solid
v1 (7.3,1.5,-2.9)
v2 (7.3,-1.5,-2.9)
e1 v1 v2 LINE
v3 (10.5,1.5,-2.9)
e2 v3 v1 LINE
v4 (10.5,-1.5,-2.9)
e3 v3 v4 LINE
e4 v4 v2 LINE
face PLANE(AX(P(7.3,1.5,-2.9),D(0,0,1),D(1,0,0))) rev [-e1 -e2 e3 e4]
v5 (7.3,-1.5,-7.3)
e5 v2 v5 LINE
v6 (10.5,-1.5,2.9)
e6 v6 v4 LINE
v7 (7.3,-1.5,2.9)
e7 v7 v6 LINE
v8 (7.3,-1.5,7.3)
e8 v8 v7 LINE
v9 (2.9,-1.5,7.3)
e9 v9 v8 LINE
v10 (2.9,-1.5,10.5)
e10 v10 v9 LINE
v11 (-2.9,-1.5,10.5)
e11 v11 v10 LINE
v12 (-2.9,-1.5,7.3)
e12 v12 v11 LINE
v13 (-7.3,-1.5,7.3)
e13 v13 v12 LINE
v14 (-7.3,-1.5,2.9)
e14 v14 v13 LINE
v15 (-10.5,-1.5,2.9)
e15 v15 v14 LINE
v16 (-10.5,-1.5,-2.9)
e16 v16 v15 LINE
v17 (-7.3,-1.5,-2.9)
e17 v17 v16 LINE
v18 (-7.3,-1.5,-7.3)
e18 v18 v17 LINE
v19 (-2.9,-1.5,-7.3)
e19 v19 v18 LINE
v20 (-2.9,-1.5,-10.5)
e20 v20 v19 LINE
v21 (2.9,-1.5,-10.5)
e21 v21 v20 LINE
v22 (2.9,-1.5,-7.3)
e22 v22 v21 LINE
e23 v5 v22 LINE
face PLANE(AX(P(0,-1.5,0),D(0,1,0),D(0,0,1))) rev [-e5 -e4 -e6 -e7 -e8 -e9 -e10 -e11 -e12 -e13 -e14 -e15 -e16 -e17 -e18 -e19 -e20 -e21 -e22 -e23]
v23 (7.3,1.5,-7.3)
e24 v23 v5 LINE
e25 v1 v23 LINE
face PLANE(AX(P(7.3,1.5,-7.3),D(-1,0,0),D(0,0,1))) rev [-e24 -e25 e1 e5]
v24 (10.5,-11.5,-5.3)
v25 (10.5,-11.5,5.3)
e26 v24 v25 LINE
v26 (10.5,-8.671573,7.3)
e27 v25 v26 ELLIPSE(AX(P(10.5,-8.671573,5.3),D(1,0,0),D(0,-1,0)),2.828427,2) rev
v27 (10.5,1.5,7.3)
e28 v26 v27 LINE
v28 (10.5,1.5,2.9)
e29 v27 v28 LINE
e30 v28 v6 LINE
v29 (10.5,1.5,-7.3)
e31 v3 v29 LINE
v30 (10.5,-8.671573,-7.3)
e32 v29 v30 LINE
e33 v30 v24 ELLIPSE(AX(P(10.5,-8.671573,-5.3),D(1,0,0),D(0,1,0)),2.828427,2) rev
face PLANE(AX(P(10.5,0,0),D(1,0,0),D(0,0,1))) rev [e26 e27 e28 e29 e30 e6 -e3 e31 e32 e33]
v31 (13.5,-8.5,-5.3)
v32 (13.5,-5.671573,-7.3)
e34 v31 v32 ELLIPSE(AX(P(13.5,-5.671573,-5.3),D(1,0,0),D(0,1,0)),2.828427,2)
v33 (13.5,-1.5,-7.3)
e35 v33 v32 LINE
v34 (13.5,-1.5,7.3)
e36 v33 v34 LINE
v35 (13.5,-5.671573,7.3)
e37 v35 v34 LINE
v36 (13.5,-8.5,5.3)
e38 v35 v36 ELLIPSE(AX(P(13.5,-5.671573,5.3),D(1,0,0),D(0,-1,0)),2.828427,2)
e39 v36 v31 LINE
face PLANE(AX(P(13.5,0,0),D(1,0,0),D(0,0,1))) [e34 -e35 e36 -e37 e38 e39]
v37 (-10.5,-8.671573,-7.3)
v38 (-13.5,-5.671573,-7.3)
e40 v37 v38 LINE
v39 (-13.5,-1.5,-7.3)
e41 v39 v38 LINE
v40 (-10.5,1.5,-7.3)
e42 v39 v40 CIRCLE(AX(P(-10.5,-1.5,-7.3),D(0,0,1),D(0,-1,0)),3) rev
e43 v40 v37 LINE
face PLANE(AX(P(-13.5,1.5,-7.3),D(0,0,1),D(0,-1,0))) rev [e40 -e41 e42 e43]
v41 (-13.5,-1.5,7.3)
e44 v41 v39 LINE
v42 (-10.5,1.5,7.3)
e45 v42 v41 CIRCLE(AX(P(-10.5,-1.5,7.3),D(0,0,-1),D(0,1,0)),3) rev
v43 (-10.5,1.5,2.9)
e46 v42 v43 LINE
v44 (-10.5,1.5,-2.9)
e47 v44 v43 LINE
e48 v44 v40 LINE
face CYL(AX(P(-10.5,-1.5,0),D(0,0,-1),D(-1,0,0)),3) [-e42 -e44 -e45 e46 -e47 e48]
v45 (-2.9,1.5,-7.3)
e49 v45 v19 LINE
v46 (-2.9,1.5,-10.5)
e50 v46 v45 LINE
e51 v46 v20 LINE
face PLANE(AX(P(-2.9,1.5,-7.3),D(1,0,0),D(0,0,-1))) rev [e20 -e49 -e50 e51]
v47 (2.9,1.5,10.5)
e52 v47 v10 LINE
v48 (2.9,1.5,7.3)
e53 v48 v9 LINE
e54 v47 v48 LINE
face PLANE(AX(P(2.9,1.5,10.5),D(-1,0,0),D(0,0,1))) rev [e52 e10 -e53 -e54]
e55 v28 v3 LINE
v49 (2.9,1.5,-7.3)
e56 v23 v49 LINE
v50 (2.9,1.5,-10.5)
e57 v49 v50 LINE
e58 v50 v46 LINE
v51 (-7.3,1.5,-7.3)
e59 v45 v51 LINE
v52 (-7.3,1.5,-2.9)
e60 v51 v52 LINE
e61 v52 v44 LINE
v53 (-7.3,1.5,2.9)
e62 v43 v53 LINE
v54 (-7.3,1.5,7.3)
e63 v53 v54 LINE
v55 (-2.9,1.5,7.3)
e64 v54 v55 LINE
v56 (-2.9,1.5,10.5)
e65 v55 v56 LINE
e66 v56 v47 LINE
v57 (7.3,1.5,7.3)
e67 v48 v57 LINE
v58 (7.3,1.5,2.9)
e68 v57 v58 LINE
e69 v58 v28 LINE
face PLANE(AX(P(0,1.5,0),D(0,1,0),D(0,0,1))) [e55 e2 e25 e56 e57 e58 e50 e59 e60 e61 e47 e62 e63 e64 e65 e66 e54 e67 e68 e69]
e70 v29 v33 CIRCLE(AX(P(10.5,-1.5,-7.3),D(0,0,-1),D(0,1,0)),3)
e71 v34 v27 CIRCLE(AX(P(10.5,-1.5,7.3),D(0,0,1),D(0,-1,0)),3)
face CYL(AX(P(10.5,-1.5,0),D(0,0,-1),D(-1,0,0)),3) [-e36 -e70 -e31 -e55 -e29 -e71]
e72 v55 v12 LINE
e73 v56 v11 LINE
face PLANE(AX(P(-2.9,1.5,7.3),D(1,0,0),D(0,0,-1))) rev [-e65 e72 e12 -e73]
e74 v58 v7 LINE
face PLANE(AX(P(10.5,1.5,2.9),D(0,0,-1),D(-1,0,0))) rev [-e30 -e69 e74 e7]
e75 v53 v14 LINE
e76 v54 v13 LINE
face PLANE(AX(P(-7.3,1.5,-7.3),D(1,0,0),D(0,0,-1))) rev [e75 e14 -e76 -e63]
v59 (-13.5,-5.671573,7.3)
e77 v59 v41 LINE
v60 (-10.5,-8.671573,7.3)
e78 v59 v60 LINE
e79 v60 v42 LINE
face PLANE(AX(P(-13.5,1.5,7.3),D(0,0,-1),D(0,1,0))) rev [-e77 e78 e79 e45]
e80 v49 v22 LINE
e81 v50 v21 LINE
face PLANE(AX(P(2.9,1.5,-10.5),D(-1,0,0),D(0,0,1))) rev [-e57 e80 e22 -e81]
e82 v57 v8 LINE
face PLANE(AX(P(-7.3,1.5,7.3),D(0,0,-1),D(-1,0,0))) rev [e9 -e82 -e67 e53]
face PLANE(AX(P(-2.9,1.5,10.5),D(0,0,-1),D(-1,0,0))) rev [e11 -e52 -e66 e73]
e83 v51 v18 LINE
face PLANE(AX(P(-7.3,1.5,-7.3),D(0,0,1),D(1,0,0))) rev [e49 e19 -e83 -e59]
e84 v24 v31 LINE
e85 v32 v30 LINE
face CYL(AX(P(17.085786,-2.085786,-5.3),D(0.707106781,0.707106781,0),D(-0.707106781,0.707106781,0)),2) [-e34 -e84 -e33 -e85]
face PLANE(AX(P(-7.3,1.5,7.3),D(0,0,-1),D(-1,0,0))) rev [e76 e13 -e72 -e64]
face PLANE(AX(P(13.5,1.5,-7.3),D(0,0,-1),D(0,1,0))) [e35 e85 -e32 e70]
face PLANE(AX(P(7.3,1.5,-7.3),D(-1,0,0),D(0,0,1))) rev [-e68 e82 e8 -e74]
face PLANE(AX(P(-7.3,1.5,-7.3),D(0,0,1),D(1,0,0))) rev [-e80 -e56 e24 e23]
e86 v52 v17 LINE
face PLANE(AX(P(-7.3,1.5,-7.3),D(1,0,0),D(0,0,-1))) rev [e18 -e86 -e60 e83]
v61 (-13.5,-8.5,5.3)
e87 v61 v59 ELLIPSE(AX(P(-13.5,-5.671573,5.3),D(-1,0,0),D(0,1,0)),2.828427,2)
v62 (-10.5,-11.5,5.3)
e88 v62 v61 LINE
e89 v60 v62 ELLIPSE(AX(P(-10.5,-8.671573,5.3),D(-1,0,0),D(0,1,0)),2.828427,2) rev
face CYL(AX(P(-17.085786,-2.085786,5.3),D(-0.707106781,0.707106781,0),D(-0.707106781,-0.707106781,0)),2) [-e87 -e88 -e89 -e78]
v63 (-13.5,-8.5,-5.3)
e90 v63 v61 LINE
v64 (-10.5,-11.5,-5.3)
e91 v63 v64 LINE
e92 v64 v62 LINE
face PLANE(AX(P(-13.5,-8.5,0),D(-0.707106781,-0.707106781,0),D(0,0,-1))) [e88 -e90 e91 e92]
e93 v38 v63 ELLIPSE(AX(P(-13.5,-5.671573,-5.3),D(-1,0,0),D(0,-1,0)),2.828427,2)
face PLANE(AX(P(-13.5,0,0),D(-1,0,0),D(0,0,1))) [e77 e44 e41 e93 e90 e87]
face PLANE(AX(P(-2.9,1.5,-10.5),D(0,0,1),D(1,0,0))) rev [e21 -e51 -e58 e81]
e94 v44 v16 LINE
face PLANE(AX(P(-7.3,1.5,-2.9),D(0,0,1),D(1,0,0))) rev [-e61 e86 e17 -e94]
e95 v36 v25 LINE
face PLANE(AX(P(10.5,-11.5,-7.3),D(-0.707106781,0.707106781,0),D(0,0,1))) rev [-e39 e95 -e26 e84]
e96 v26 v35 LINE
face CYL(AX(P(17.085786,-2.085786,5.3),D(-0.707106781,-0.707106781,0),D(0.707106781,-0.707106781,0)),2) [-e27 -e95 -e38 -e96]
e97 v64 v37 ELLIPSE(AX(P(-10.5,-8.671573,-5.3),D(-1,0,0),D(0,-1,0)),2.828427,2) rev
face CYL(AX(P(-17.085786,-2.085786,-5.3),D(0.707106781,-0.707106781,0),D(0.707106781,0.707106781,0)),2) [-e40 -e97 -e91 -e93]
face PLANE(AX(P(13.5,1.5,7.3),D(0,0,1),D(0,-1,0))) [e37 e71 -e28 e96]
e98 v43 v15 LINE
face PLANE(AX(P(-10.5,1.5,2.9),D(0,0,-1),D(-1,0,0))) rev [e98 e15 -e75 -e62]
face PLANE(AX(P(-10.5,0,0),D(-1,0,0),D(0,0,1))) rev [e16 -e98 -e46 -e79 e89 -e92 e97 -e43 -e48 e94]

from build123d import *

# Parameters (mm, degrees)
SKETCH1_W           = 14.6
SKETCH1_H           = 14.6
BOSS_EXTRUDE1_DEPTH = 1.5
SKETCH2_W           = 5.8
SKETCH2_H           = 3.2
SKETCH2_W_2         = 3.2
SKETCH2_H_2         = 5.8
BOSS_EXTRUDE2_DEPTH = 1.5
SKETCH4_W           = 14.6
SKETCH4_H           = 13
BOSS_EXTRUDE3_DEPTH = 3
FILLET5_R           = 3
CHAMFER1_SIZE       = 3
FILLET4_R           = 2


with BuildPart() as part:
    # Sketch1 → Boss-Extrude1 (new, symmetric)
    with BuildSketch(Plane(origin=(0, 0, 0), x_dir=(1, 0, 0), z_dir=(0, 1, 0))):
        Rectangle(SKETCH1_W, SKETCH1_H)
    extrude(amount=BOSS_EXTRUDE1_DEPTH, both=True)

    # Sketch2 → Boss-Extrude2 (add, symmetric)
    with BuildSketch(Plane(origin=(0, 0, 0), x_dir=(1, 0, 0), z_dir=(0, 1, 0))):
        with Locations((0, 8.9)):
            Rectangle(SKETCH2_W, SKETCH2_H)
        with Locations((0, -8.9)):
            Rectangle(SKETCH2_W, SKETCH2_H)
        with Locations((-8.9, 0)):
            Rectangle(SKETCH2_W_2, SKETCH2_H_2)
        with Locations((8.9, 0)):
            Rectangle(SKETCH2_W_2, SKETCH2_H_2)
    extrude(amount=BOSS_EXTRUDE2_DEPTH, both=True)

    # Sketch4 → Boss-Extrude3 (add)
    with BuildSketch(Plane.ZY.offset(10.5)):
        with Locations((0, -5)):
            Rectangle(SKETCH4_W, SKETCH4_H)
    boss_extrude3 = extrude(amount=BOSS_EXTRUDE3_DEPTH)

    # Mirror1: Boss-Extrude3 across plane
    add(boss_extrude3.mirror(Plane(origin=(0, 0, 0), x_dir=(0, 0, 1), z_dir=(1, 0, 0))))

    # Fillet5
    fillet5_edges = [part.edges().sort_by_distance(p)[0] for p in [
        (-13.5, 1.5, 0),
        (13.5, 1.5, 0),
    ]]
    fillet(fillet5_edges, radius=FILLET5_R)

    # Chamfer1
    chamfer1_edges = [part.edges().sort_by_distance(p)[0] for p in [
        (13.5, -11.5, 0),
        (-13.5, -11.5, 0),
    ]]
    chamfer(chamfer1_edges, length=CHAMFER1_SIZE - 0.0001)  # a hair under: the kernel refuses the full size

    # Fillet4
    fillet4_edges = [part.edges().sort_by_distance(p)[0] for p in [
        (-12.00005, -10.00005, 7.3),
        (-12.00005, -10.00005, -7.3),
        (12.00005, -10.00005, 7.3),
        (12.00005, -10.00005, -7.3),
    ]]
    fillet(fillet4_edges, radius=FILLET4_R)


solid = part.part
